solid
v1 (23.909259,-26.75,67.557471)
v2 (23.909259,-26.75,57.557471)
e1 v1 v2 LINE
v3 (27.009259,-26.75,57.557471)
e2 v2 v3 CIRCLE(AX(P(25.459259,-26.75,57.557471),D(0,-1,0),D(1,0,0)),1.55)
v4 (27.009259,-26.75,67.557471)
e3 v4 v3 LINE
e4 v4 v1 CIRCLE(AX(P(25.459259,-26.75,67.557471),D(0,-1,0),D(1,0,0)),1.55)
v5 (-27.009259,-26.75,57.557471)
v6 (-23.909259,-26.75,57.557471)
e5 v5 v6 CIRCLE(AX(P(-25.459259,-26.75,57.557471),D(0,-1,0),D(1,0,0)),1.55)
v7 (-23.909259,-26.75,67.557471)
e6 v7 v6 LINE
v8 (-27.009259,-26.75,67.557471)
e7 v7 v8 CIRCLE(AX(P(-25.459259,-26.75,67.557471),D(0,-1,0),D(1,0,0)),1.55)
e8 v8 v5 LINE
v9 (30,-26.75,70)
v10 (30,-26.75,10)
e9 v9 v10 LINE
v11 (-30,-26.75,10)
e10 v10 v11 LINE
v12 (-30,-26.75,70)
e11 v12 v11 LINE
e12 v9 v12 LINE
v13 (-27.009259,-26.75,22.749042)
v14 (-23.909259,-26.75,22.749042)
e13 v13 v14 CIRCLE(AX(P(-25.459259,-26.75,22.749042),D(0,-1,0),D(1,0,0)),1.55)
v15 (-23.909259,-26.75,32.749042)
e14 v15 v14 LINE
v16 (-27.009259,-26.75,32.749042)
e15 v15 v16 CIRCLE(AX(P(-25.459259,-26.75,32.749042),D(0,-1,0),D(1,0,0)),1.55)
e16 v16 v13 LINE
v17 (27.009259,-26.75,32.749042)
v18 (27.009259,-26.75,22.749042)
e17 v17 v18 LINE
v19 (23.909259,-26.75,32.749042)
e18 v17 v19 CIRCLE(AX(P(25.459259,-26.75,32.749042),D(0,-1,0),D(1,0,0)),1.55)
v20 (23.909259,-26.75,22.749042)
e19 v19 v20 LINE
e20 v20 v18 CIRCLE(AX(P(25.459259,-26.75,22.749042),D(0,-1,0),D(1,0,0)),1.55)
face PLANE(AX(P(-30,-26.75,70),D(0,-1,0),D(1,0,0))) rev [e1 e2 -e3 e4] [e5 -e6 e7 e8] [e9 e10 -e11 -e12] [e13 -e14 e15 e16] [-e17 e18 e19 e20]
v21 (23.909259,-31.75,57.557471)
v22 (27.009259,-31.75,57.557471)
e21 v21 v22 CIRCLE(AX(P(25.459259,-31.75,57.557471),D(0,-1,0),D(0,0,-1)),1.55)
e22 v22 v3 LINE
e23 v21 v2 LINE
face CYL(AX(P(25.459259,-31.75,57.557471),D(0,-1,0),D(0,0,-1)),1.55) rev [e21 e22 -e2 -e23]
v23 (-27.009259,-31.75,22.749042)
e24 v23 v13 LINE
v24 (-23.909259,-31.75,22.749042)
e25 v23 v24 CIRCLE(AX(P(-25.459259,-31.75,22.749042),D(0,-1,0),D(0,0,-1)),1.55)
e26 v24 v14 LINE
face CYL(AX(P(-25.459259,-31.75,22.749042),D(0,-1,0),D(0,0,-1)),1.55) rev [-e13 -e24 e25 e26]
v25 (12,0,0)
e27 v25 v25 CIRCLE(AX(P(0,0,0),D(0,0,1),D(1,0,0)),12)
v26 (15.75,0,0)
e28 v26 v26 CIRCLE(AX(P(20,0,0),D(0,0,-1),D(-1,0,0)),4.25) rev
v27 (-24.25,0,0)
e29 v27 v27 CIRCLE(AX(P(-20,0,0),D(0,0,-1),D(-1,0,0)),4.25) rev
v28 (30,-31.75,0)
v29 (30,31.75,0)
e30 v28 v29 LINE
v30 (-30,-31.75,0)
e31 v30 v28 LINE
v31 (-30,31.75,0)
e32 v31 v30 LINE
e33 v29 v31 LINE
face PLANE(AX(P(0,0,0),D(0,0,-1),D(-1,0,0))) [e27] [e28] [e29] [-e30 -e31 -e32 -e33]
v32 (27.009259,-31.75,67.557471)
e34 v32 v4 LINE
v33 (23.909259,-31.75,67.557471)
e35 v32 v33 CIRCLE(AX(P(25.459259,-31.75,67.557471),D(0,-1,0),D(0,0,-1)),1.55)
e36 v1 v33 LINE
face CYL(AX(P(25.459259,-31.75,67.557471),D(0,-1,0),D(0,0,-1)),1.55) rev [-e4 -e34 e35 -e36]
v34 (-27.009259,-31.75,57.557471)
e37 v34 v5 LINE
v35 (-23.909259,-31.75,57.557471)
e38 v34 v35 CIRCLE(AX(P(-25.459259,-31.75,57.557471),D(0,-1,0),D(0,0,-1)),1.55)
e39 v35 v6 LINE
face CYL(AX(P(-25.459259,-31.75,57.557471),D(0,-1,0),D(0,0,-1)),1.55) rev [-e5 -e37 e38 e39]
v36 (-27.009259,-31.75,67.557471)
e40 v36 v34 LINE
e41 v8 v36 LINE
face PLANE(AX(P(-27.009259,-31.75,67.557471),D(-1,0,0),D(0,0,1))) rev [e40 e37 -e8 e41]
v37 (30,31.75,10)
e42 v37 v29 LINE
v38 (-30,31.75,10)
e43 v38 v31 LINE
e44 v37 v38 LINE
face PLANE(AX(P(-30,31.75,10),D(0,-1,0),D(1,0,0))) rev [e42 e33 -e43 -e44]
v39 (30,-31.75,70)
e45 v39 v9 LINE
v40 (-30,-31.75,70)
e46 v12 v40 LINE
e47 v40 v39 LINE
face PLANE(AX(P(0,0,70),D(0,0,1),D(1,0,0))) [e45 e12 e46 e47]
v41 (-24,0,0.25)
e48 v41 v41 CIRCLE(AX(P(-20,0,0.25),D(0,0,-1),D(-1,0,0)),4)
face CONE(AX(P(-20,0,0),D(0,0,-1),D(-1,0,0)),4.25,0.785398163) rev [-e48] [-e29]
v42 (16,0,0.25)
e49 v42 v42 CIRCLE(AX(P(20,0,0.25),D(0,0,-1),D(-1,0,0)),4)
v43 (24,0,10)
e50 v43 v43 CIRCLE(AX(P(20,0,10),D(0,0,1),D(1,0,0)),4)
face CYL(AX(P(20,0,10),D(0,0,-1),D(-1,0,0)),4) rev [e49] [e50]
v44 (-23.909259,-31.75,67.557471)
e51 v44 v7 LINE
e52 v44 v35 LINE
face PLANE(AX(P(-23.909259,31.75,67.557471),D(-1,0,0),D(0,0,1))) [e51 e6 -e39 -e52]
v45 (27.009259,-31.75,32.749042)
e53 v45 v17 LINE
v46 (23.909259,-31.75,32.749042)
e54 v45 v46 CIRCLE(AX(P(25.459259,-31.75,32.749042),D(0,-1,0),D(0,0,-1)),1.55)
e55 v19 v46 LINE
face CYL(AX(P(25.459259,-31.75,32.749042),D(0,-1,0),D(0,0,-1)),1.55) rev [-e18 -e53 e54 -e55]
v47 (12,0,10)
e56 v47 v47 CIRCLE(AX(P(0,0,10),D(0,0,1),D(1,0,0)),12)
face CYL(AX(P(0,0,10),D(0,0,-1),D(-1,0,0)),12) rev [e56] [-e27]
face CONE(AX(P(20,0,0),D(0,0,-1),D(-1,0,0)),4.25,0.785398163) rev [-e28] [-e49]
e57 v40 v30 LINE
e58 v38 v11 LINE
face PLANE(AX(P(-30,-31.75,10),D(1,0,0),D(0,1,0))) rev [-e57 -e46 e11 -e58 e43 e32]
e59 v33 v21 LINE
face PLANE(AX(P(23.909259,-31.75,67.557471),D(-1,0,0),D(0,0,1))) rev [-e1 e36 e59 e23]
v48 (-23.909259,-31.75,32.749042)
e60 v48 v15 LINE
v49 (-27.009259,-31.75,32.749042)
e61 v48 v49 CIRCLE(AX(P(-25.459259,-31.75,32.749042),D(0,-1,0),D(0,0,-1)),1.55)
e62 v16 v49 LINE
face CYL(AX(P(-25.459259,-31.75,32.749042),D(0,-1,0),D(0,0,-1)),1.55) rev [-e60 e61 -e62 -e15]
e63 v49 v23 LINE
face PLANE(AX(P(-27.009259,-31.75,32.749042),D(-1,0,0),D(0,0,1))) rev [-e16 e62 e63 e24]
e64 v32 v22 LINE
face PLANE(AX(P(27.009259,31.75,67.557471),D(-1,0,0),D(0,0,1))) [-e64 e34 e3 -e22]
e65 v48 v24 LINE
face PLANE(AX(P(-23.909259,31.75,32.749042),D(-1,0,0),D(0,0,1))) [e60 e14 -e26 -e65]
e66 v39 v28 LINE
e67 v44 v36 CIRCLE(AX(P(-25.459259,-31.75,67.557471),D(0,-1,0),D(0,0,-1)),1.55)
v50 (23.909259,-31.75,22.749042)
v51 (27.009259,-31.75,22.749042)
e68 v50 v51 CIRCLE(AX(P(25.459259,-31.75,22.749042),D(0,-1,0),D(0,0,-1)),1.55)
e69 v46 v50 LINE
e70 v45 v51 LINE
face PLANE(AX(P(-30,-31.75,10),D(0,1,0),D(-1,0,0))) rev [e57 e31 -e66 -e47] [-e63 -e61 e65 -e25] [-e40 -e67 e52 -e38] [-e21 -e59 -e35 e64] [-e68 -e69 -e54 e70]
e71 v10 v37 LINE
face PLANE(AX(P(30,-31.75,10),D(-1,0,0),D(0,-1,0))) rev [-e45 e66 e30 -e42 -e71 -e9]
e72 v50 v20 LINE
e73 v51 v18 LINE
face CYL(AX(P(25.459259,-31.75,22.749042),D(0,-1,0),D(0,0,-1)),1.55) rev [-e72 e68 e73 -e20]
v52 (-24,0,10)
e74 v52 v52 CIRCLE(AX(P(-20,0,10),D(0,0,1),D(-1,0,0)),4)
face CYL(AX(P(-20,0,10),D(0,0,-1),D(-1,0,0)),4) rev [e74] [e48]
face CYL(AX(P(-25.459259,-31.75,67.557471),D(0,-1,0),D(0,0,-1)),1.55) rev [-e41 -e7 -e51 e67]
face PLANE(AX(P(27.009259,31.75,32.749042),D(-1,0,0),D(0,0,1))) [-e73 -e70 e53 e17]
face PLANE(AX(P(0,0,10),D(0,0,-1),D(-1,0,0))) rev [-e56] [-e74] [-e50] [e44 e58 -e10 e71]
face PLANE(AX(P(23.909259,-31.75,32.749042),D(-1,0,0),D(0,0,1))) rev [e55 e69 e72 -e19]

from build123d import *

# Parameters (mm, degrees)
SKETCH_1_W      = 60
SKETCH_1_H      = 63.5
SKETCH_1_R      = 12
SKETCH_1_R_2    = 4
EXTRUDE_1_DEPTH = 10
CHAMFER_1_SIZE  = 0.25
SKETCH_2_W      = 60
SKETCH_2_H      = 5
EXTRUDE_2_DEPTH = 60
MM_START        = -31.75
MM_1_DEPTH      = 5


# Read off the part's stored shape, not the designer's step: 大小mm 暗销槽口1
with BuildPart() as part:
    # 草图1 → 凸台-拉伸1 (new body)
    with BuildSketch(Plane.XY):
        Rectangle(SKETCH_1_W, SKETCH_1_H)
        Circle(SKETCH_1_R, mode=Mode.SUBTRACT)
        with Locations((20, 0)):
            Circle(SKETCH_1_R_2, mode=Mode.SUBTRACT)
        with Locations(Location((-20, 0, 0), (0, 0, 180))):
            Circle(SKETCH_1_R_2, mode=Mode.SUBTRACT)
    extrude(amount=EXTRUDE_1_DEPTH)

    # 倒角1
    chamfer_1_edges = [part.edges().sort_by_distance(p)[0] for p in [
        (16, 0, 0),
        (-16, 0, 0),
    ]]
    chamfer(chamfer_1_edges, length=CHAMFER_1_SIZE)

    # 草图2 → 凸台-拉伸2 (add)
    with BuildSketch(Plane.XY.offset(10)):
        with Locations((0, -29.25)):
            Rectangle(SKETCH_2_W, SKETCH_2_H)
    extrude(amount=EXTRUDE_2_DEPTH)

    # 大小mm 暗销槽口1 outline → 大小mm 暗销槽口1 (cut)
    with BuildSketch(Plane(origin=(0, 0, 0), x_dir=(1, 0, 0), z_dir=(0, 1, 0)).offset(MM_START)):
        with BuildLine():
            ThreePointArc((23.909259259, -32.749042146), (25.459259259, -34.299042146), (27.009259259, -32.749042146))
            Line((27.009259259, -32.749042146), (27.009259259, -22.749042146))
            ThreePointArc((27.009259259, -22.749042146), (25.459259259, -21.199042146), (23.909259259, -22.749042146))
            Line((23.909259259, -22.749042146), (23.909259259, -32.749042146))
        make_face()
        with BuildLine():
            Line((27.009259259, -67.557471264), (27.009259259, -57.557471264))
            ThreePointArc((27.009259259, -57.557471264), (25.459259259, -56.007471264), (23.909259259, -57.557471264))
            Line((23.909259259, -57.557471264), (23.909259259, -67.557471264))
            ThreePointArc((23.909259259, -67.557471264), (25.459259259, -69.107471264), (27.009259259, -67.557471264))
        make_face()
        with BuildLine():
            Line((-23.909259259, -67.557471264), (-23.909259259, -57.557471264))
            ThreePointArc((-23.909259259, -57.557471264), (-25.459259259, -56.007471264), (-27.009259259, -57.557471264))
            Line((-27.009259259, -57.557471264), (-27.009259259, -67.557471264))
            ThreePointArc((-27.009259259, -67.557471264), (-25.459259259, -69.107471264), (-23.909259259, -67.557471264))
        make_face()
        with BuildLine():
            Line((-23.909259259, -32.749042146), (-23.909259259, -22.749042146))
            ThreePointArc((-23.909259259, -22.749042146), (-25.459259259, -21.199042146), (-27.009259259, -22.749042146))
            Line((-27.009259259, -22.749042146), (-27.009259259, -32.749042146))
            ThreePointArc((-27.009259259, -32.749042146), (-25.459259259, -34.299042146), (-23.909259259, -32.749042146))
        make_face()
    extrude(amount=MM_1_DEPTH, mode=Mode.SUBTRACT)


solid = part.part
